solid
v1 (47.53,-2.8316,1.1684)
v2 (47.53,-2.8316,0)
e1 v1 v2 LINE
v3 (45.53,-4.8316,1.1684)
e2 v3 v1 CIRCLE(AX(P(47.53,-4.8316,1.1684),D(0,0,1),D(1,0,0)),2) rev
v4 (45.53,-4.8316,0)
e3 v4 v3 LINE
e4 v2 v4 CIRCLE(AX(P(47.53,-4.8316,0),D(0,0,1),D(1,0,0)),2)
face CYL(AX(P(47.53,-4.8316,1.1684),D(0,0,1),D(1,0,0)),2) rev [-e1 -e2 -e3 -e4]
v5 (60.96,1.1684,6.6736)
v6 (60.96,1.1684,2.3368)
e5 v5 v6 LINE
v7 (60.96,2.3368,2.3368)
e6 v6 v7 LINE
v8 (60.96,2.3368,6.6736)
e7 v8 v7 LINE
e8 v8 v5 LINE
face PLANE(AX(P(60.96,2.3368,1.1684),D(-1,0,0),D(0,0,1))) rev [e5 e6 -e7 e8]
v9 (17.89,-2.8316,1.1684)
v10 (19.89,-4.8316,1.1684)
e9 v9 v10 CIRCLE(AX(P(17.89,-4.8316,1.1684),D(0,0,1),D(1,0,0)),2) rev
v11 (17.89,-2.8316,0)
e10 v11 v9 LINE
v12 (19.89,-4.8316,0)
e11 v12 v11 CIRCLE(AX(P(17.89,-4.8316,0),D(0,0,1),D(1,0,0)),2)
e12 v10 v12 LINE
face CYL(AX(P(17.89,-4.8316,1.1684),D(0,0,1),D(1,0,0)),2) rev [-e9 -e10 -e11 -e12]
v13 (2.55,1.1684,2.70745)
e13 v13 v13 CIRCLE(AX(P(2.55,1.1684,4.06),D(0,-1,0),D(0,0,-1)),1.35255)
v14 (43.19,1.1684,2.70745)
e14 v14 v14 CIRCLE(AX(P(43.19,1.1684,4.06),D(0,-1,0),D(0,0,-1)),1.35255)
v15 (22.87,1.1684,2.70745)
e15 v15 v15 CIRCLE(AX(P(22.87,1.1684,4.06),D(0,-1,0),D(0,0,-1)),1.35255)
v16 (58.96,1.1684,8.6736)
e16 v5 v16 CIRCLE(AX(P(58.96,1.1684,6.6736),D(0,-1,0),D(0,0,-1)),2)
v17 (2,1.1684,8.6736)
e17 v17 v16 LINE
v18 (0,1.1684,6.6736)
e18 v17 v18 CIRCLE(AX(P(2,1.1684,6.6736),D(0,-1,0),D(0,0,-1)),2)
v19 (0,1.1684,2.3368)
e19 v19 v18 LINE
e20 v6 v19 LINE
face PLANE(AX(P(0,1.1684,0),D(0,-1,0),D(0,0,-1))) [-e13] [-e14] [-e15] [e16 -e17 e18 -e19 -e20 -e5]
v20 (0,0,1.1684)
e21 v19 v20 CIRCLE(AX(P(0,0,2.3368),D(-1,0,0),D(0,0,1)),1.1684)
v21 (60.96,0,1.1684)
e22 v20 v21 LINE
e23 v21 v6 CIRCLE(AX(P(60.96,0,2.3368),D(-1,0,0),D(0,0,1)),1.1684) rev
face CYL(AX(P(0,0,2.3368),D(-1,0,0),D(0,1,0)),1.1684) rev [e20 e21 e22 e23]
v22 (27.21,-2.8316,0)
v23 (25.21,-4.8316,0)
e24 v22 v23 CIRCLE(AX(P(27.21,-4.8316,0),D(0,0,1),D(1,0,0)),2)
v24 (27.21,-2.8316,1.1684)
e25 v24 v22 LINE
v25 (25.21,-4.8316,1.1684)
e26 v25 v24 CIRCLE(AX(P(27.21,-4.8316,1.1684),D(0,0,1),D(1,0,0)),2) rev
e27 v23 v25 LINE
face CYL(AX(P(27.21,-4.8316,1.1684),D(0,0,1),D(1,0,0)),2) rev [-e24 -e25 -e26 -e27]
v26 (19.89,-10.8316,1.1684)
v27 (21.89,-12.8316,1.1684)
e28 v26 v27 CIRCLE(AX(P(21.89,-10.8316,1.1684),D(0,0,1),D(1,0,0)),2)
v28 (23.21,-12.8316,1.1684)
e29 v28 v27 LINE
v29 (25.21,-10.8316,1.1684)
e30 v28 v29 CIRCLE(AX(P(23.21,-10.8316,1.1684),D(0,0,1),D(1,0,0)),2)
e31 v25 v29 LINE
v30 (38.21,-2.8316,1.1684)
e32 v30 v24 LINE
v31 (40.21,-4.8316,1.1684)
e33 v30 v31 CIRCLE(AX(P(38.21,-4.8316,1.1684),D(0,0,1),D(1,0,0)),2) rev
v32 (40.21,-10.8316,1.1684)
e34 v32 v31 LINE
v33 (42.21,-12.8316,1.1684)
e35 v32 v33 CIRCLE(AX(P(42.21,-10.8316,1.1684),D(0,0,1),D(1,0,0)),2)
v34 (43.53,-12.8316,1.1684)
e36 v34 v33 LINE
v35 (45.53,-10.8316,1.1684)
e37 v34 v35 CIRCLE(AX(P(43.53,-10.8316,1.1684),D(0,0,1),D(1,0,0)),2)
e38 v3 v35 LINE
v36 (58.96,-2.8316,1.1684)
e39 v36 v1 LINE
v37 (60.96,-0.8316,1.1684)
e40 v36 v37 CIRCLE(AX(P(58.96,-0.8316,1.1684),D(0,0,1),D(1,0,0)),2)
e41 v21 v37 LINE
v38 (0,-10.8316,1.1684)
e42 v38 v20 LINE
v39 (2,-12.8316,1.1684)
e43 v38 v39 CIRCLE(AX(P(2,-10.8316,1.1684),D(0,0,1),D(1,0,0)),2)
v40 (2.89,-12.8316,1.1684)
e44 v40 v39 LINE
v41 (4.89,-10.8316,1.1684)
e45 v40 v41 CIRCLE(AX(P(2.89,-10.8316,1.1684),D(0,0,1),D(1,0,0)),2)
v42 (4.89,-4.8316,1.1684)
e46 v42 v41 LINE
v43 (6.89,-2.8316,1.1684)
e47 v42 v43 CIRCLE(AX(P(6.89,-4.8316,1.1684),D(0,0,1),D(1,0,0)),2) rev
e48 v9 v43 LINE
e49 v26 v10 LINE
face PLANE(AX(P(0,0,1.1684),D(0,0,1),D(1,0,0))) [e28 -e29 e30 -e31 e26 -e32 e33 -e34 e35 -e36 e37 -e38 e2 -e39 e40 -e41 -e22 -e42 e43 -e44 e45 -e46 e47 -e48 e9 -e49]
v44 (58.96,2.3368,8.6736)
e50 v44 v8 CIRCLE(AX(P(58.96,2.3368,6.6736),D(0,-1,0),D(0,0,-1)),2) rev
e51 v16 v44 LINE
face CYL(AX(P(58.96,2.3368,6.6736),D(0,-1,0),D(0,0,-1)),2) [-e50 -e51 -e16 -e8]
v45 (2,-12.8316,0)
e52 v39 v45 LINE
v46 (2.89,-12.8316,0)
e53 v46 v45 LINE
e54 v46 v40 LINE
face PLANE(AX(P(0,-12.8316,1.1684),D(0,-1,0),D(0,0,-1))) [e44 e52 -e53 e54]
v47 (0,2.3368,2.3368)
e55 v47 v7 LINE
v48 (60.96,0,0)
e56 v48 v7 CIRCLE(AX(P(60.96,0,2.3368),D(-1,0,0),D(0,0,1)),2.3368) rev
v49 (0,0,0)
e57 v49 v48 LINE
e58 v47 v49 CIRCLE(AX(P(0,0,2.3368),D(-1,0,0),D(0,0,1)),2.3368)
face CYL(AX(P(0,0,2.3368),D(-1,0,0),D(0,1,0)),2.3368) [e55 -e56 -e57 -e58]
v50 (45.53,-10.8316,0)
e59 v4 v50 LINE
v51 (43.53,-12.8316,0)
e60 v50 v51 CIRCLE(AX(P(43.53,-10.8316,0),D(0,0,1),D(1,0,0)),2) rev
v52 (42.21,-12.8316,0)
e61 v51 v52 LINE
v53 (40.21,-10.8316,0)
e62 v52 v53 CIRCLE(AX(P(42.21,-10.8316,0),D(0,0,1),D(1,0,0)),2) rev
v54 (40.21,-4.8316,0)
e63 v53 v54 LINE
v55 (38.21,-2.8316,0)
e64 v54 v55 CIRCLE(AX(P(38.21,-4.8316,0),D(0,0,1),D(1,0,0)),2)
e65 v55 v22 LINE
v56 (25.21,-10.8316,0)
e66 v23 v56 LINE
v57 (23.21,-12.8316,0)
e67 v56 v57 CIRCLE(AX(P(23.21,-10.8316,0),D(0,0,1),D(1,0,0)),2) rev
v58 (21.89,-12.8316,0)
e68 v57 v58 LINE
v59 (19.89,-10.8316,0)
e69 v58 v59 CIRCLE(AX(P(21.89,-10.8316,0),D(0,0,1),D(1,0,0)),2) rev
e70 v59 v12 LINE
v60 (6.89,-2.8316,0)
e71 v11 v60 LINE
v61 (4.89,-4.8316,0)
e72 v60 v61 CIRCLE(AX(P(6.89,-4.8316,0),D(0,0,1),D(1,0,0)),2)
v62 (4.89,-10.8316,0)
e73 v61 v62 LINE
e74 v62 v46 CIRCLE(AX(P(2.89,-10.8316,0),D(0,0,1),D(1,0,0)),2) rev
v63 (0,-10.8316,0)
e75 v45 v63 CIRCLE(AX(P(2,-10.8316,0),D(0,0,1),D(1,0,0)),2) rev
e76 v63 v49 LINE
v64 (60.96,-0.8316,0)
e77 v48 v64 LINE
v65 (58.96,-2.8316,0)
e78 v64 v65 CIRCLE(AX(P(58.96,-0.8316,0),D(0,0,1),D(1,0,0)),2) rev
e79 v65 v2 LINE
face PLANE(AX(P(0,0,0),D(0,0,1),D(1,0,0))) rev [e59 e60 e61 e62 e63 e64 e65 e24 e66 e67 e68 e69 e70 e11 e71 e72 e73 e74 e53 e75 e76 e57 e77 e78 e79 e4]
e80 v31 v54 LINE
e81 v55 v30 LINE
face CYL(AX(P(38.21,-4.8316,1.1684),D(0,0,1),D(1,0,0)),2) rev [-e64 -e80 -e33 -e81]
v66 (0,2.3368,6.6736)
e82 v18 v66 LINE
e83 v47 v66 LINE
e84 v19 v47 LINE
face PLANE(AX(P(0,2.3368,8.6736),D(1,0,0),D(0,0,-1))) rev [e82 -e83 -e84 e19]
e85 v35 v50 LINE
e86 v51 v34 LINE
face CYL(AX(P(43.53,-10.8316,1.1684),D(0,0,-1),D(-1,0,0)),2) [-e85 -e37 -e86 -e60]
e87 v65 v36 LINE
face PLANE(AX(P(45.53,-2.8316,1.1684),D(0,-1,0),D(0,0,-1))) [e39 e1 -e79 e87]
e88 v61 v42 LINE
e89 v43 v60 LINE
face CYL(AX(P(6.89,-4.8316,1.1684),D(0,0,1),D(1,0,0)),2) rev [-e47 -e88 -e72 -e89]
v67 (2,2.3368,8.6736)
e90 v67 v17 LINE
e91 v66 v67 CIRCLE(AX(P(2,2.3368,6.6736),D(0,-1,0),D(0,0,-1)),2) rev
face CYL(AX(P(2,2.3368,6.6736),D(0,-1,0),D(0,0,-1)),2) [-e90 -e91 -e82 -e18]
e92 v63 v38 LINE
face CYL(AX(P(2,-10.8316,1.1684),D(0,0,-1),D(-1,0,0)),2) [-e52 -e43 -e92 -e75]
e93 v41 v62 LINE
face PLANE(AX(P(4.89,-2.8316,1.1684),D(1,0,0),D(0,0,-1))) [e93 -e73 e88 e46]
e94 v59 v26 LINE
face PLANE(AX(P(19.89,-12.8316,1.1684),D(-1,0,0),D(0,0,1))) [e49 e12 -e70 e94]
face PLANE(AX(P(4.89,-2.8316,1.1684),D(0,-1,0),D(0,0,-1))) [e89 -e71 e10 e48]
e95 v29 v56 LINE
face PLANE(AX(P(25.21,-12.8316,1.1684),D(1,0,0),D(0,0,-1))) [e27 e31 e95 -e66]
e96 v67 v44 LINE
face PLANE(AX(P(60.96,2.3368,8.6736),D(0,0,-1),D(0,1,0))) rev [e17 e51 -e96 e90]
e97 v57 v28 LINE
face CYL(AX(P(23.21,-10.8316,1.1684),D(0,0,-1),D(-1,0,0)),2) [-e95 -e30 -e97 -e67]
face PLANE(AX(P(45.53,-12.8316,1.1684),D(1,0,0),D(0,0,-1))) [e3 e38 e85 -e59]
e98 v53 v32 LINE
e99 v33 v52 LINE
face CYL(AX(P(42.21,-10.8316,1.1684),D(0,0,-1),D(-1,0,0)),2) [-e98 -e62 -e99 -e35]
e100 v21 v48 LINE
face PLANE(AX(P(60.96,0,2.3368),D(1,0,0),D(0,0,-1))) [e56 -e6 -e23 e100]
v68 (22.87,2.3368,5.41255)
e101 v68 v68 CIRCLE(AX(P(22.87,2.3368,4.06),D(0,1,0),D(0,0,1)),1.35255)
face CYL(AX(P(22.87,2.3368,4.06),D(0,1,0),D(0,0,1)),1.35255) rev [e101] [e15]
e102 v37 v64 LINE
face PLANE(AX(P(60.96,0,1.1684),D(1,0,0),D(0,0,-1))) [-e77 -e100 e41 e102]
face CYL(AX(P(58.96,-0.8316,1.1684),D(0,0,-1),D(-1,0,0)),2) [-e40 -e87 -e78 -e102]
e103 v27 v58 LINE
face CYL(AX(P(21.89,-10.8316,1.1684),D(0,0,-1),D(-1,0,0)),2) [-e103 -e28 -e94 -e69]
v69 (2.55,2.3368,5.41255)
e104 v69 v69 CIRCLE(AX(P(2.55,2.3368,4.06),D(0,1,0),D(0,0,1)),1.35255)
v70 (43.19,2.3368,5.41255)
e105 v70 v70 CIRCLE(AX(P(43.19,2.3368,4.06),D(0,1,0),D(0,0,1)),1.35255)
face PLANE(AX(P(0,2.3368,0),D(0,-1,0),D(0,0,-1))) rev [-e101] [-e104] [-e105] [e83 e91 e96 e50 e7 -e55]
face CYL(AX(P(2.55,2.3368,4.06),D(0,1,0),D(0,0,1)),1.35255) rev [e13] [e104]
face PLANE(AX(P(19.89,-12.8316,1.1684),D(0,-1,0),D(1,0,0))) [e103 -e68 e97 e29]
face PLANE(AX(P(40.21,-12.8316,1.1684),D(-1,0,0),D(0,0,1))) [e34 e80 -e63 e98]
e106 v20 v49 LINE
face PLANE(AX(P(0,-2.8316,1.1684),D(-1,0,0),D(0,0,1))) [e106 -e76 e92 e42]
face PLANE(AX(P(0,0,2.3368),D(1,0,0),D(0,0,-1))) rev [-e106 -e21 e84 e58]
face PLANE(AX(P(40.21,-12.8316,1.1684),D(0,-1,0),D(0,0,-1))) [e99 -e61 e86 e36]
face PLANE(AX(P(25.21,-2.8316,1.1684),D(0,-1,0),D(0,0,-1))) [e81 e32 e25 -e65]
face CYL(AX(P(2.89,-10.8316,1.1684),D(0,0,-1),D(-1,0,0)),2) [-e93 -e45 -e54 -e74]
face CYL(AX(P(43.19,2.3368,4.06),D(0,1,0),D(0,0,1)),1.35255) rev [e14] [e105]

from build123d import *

# Parameters (mm, degrees)
BASE_FLANGE1_DEPTH        = 1.1684
EDGE_FLANGE1_DEPTH        = 60.96
TAP_DRILL_FOR_6_32_TAP1_D = 2.7051
FILLET1_R                 = 2


# Sheet-metal steps are written as plain solids
with BuildPart() as part:
    # Sketch1 → Base-Flange1 (new body)
    with BuildSketch(Plane(origin=(0, 0, 0), x_dir=(1, 0, 0), z_dir=(0, 0, -1))):
        Polygon((0, 0), (60.96, 0), (60.96, 2.8316), (45.53, 2.8316), (45.53, 12.8316), (40.21, 12.8316), (40.21, 2.8316), (25.21, 2.8316), (25.21, 12.8316), (19.89, 12.8316), (19.89, 2.8316), (4.89, 2.8316), (4.89, 12.8316), (0, 12.8316), (0, 2.8316), align=None)
    extrude(amount=-BASE_FLANGE1_DEPTH)

    # Edge-Flange1 section (across the edge) → Edge-Flange1 (add)
    with BuildSketch(Plane(origin=(60.96, 1.1684, 1.1684), x_dir=(0, -1, 0), z_dir=(-1, 0, 0))):
        with BuildLine():
            Line((-1.1684, 1.1684), (-1.1684, 7.5052))
            Line((-1.1684, 7.5052), (0, 7.5052))
            Line((0, 7.5052), (0, 1.1684))
            ThreePointArc((0, 1.1684), (0.342216437, 0.342216437), (1.1684, 0))
            Line((1.1684, 0), (1.1684, -1.1684))
            ThreePointArc((1.1684, -1.1684), (-0.483967126, -0.483967126), (-1.1684, 1.1684))
        make_face()
    extrude(amount=EDGE_FLANGE1_DEPTH)

    # Tap Drill for #6-32 Tap1 (through all)
    with Locations(Plane(origin=(0, 2.3368, 0), x_dir=(1, 0, 0), z_dir=(0, 1, 0))):
        with Locations((2.55, -4.06), (22.87, -4.06), (43.19, -4.06)):
            Hole(TAP_DRILL_FOR_6_32_TAP1_D / 2)

    # Fillet1
    fillet1_edges = [part.edges().sort_by_distance(p)[0] for p in [
        (0, -12.8316, 0.5842),
        (4.89, -12.8316, 0.5842),
        (4.89, -2.8316, 0.5842),
        (19.89, -2.8316, 0.5842),
        (19.89, -12.8316, 0.5842),
        (25.21, -12.8316, 0.5842),
        (25.21, -2.8316, 0.5842),
        (40.21, -2.8316, 0.5842),
        (40.21, -12.8316, 0.5842),
        (45.53, -12.8316, 0.5842),
        (45.53, -2.8316, 0.5842),
        (60.96, -2.8316, 0.5842),
        (60.96, 1.7526, 8.6736),
        (0, 1.7526, 8.6736),
    ]]
    fillet(fillet1_edges, radius=FILLET1_R)


solid = part.part
